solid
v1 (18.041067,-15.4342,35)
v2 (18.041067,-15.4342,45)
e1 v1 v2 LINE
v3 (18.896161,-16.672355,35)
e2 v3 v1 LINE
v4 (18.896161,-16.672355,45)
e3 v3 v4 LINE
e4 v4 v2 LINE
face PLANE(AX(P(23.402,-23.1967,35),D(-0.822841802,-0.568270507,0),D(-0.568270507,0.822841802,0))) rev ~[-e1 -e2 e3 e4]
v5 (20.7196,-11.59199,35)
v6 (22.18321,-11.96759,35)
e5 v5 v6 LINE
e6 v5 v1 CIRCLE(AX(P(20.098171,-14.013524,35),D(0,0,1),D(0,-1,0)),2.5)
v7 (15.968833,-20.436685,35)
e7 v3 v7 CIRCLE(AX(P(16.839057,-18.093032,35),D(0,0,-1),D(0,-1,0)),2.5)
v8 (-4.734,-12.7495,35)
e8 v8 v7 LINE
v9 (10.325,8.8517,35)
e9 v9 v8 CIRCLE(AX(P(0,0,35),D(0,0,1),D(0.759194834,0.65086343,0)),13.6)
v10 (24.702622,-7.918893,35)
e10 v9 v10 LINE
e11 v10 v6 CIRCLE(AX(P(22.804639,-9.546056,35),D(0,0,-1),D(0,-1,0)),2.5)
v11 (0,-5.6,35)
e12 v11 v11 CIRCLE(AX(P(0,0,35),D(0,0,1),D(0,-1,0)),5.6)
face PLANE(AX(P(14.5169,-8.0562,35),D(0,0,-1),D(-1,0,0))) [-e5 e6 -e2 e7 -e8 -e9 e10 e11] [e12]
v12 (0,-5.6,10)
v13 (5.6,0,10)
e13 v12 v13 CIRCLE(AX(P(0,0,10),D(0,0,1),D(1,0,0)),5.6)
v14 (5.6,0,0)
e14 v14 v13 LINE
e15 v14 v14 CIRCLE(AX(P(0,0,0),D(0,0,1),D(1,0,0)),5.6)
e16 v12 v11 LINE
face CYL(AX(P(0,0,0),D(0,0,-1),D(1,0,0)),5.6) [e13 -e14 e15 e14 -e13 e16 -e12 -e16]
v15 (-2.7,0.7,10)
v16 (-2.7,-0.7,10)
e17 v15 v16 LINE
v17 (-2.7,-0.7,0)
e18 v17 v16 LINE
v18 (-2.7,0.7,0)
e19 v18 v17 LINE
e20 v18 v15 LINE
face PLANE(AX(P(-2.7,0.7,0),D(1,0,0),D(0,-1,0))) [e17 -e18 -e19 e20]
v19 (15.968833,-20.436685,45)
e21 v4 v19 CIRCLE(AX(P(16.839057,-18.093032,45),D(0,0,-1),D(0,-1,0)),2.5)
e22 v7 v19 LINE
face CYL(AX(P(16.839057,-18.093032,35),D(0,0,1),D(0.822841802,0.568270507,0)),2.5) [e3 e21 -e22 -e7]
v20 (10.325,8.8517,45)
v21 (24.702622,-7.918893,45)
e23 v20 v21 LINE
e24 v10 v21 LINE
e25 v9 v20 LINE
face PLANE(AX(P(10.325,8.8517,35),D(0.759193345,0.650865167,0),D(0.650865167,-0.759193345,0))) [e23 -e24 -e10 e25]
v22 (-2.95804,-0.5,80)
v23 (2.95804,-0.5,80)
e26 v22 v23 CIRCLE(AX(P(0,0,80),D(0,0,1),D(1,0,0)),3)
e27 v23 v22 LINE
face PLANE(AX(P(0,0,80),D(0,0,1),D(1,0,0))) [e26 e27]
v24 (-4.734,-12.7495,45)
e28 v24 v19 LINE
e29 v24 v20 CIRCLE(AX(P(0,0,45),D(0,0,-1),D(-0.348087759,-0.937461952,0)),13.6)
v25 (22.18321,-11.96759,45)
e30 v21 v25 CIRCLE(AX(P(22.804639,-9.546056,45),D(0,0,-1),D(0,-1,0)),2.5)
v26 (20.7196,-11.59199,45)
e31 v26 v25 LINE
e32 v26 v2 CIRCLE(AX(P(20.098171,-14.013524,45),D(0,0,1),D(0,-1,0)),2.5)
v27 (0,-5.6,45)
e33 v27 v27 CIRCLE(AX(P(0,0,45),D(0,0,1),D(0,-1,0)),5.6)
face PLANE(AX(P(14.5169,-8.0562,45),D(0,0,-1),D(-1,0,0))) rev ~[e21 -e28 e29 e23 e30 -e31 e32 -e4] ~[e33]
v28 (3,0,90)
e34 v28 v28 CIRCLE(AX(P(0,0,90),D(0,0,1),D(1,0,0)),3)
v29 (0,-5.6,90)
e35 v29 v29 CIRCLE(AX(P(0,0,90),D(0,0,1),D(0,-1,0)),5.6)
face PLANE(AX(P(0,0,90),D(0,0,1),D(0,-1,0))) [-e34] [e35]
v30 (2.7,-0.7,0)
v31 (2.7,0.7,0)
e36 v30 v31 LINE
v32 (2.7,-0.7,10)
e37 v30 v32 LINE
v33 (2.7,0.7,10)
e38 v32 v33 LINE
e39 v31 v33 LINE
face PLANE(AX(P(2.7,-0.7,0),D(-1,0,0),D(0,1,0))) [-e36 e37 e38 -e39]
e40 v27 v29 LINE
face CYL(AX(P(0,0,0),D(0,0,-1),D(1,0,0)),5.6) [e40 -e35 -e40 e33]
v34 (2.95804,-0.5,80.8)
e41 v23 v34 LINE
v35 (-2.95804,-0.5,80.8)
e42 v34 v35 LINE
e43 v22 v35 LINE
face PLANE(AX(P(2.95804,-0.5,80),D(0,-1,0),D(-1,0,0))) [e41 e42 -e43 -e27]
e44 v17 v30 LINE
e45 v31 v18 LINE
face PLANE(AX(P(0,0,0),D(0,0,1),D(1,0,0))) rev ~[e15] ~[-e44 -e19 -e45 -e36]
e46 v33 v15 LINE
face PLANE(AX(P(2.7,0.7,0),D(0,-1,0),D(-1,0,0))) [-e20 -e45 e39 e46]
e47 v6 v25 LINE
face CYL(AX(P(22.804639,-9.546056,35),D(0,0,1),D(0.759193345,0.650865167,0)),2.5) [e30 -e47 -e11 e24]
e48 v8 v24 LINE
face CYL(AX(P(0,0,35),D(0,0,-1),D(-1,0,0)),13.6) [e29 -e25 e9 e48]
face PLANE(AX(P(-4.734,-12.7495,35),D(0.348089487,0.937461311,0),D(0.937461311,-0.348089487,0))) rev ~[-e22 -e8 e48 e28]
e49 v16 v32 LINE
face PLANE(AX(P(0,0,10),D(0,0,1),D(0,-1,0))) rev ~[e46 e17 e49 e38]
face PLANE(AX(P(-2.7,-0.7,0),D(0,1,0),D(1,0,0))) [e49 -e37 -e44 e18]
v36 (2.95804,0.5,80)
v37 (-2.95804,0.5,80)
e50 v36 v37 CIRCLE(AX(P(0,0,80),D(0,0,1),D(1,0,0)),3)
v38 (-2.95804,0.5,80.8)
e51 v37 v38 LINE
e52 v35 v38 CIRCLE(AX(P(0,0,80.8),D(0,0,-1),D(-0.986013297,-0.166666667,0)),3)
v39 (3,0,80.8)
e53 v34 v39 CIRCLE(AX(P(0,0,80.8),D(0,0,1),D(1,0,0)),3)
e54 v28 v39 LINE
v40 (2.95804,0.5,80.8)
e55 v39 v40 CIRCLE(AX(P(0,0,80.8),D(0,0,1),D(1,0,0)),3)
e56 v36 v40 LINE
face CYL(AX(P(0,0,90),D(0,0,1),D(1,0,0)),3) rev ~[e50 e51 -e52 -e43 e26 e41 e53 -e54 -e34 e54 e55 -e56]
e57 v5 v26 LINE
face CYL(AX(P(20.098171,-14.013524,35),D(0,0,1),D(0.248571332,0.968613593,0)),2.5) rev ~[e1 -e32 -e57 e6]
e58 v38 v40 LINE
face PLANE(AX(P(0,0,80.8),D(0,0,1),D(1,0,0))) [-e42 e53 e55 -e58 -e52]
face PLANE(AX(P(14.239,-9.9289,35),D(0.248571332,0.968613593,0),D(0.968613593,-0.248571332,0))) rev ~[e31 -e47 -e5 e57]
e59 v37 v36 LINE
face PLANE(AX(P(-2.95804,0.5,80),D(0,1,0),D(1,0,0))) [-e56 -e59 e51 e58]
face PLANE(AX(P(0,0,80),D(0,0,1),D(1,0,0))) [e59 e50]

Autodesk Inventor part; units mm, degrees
ref_plane "YZ Plane" through (0, 0, 0) normal (1, 0, 0) x (0, 1, 0)
ref_plane "XZ Plane" through (0, 0, 0) normal (0, 1, 0) x (-1, 0, 0)
sketch "Sketch1" plane through (0, 0, 0) normal (0, 0, 1) x (1, 0, 0)
  line L0 (2.6, -0.6) -> (-2.6, -0.6) projected
  line L1 (-2.6, -0.6) -> (-2.6, 0.6) projected
  line L2 (-2.6, 0.6) -> (2.6, 0.6) projected
  line L3 (2.6, 0.6) -> (2.6, -0.6) projected
  circle A0 centre (0, 0) radius 3.6 projected
  line L4 (-2.7, 0.7) -> (-2.7, -0.7)
  line L5 (-2.7, -0.7) -> (2.7, -0.7)
  line L6 (2.7, -0.7) -> (2.7, 0.7)
  line L7 (2.7, 0.7) -> (-2.7, 0.7)
  circle A1 centre (0, 0) radius 5.6
  dimension "d0" = 0.1
  dimension "d5" = 2
extrude "Extrusion1" add sketch "Sketch1" along normal blind 10 contours A0 | A1
sketch "Sketch2" plane through (0, 0, 10) normal (0, 0, 1) x (0, -1, 0)
  line L0 (-0.7, -2.7) -> (-0.7, 2.7) projected
  line L1 (-0.7, 2.7) -> (0.7, 2.7) projected
  line L2 (0.7, 2.7) -> (0.7, -2.7) projected
  line L3 (0.7, -2.7) -> (-0.7, -2.7) projected
  circle A0 centre (0, 0) radius 3.75
  circle A1 centre (0, 0) radius 5.6 projected
ref_plane "Work Plane1" through (-14, -11, 93) normal (0, 0, -1) x (0, 1, 0)
extrude "Extrusion2" add sketch "Sketch2" along normal blind 80 contours L0 L1 L2 L3 | A0 | A1
ref_plane "Work Plane2" through (14.5169, -8.0562, 35) normal (0, 0, -1) x (-1, 0, 0)
sketch "Sketch4" plane through (0, 0, 90) normal (0, 0, 1) x (1, 0, 0)
  circle A0 centre (0, 0) radius 3
  dimension "d20" = 6
extrude "Extrusion4" cut sketch "Sketch4" against normal blind 10
sketch "Sketch5" plane through (0, 0, 80) normal (0, 0, 1) x (1, 0, 0)
  circle A0 centre (0, 0) radius 3 projected
  circle A1 centre (0, 0) radius 3 projected
  line L0 (-3, 0.5) -> (3, 0.5)
  line L1 (3, 0.5) -> (3, -0.5)
  line L2 (3, -0.5) -> (-3, -0.5)
  line L3 (-3, -0.5) -> (-3, 0.5)
  line L4 (-3, 0.5) -> (3, -0.5) construction
  line L5 (3, 0.5) -> (-3, -0.5) construction
  point P0 (-2.958, -0.5)
  point P1 (2.958, -0.5)
  point P2 (2.958, 0.5)
  point P3 (-2.958, 0.5)
  dimension "d24" = 6
  dimension "d25" = 1
extrude "Extrusion5" add sketch "Sketch5" along normal blind 0.8 contours A0 L2 L0
sketch "Sketch6" plane through (14.5169, -8.0562, 35) normal (0, 0, -1) x (-1, 0, 0)
  circle A0 centre (14.5169, 8.0562) radius 5.6 projected
  circle A1 centre (14.5169, 8.0562) radius 13.6
  line L0 (19.2509, -4.6933) -> (-8.8851, -15.1405)
  line L1 (4.1919, 16.9079) -> (-15.3464, -5.8823)
  line L2 (-8.8851, -15.1405) -> (0.2779, -1.8727)
  line L3 (0.2779, -1.8727) -> (-15.3464, -5.8823)
  line L4 (20.3441, -4.2322) -> (-52.8556, -38.9438)
  line L5 (4.1919, 16.9079) -> (-52.8556, -38.9438)
  arc A2 (-101.4982, -27.3726) -> (-98.3101, -29.4028) centre (-99.5525, -27.8355) ccw
  arc A3 (-98.7514, -19.105) -> (-101.4982, -27.3726) centre (-52.8556, -38.9438) ccw
  line L6 (-98.7514, -19.105) -> (-109.7663, -14.3437)
  arc A4 (-98.2472, 3.2889) -> (-109.7663, -14.3437) centre (-52.8556, -38.9438) ccw
  line L7 (-98.2472, 3.2889) -> (-89.4617, -4.8852)
  arc A5 (-18.7969, -2.3377) -> (-89.4617, -4.8852) centre (-52.8556, -38.9438) ccw
  line L8 (-18.7969, -2.3377) -> (-26.971, -11.1232)
  arc A6 (-41.1368, -75.0917) -> (-26.971, -11.1232) centre (-52.8556, -38.9438) ccw
  line L9 (-41.1368, -75.0917) -> (-42.3055, -71.487)
  arc A7 (-42.3055, -71.487) -> (-59.8761, -67.1138) centre (-52.9931, -76.9436) ccw
  arc A8 (-61.0624, -66.7913) -> (-59.8761, -67.1138) centre (-60.3349, -66.4585) ccw
  arc A9 (-61.0624, -66.7913) -> (-73.0205, -59.8295) centre (-71.9745, -71.7838) ccw
  arc A10 (-73.8866, -58.957) -> (-73.0205, -59.8295) centre (-73.0902, -59.0325) ccw
  arc A11 (-73.8866, -58.957) -> (-80.7617, -46.9489) centre (-85.8331, -57.8246) ccw
  arc A12 (-81.0756, -45.7602) -> (-80.7617, -46.9489) centre (-80.4236, -46.2238) ccw
  arc A13 (-81.0756, -45.7602) -> (-85.3215, -28.1585) centre (-90.8553, -38.8063) ccw
  line L10 (-85.3215, -28.1585) -> (-88.9177, -26.9638)
  arc A14 (-88.9177, -26.9638) -> (-98.3101, -29.4028) centre (-90.8553, -38.8063) ccw
  circle A15 centre (-52.8556, -38.9438) radius 4
  circle A16 centre (-52.8556, -38.9438) radius 18
  circle A17 centre (-52.8556, -38.9438) radius 50
  line L11 (0.2779, -1.8727) -> (-52.8556, -38.9438)
  point P0 (2.5698, 1.558)
  point P1 (4.2932, -0.9124)
  dimension "d30" = 8
  dimension "d34" = 35
  dimension "d36" = 5
  dimension "d37" = 5
  dimension "d39" = 35
extrude "Extrusion6" add sketch "Sketch6" against normal blind 10 contours A1 | A1 L0 L2 L3 L1
fillet "Fillet1" radius 2.5 3 edges at (23.402, -23.1967, 40) (29.8633, -13.9385, 40) (14.2391, -9.9288, 40)
equation "\"d37\" = d36"
equation "\"d39\" = d34"
properties part number "reverser-base"
